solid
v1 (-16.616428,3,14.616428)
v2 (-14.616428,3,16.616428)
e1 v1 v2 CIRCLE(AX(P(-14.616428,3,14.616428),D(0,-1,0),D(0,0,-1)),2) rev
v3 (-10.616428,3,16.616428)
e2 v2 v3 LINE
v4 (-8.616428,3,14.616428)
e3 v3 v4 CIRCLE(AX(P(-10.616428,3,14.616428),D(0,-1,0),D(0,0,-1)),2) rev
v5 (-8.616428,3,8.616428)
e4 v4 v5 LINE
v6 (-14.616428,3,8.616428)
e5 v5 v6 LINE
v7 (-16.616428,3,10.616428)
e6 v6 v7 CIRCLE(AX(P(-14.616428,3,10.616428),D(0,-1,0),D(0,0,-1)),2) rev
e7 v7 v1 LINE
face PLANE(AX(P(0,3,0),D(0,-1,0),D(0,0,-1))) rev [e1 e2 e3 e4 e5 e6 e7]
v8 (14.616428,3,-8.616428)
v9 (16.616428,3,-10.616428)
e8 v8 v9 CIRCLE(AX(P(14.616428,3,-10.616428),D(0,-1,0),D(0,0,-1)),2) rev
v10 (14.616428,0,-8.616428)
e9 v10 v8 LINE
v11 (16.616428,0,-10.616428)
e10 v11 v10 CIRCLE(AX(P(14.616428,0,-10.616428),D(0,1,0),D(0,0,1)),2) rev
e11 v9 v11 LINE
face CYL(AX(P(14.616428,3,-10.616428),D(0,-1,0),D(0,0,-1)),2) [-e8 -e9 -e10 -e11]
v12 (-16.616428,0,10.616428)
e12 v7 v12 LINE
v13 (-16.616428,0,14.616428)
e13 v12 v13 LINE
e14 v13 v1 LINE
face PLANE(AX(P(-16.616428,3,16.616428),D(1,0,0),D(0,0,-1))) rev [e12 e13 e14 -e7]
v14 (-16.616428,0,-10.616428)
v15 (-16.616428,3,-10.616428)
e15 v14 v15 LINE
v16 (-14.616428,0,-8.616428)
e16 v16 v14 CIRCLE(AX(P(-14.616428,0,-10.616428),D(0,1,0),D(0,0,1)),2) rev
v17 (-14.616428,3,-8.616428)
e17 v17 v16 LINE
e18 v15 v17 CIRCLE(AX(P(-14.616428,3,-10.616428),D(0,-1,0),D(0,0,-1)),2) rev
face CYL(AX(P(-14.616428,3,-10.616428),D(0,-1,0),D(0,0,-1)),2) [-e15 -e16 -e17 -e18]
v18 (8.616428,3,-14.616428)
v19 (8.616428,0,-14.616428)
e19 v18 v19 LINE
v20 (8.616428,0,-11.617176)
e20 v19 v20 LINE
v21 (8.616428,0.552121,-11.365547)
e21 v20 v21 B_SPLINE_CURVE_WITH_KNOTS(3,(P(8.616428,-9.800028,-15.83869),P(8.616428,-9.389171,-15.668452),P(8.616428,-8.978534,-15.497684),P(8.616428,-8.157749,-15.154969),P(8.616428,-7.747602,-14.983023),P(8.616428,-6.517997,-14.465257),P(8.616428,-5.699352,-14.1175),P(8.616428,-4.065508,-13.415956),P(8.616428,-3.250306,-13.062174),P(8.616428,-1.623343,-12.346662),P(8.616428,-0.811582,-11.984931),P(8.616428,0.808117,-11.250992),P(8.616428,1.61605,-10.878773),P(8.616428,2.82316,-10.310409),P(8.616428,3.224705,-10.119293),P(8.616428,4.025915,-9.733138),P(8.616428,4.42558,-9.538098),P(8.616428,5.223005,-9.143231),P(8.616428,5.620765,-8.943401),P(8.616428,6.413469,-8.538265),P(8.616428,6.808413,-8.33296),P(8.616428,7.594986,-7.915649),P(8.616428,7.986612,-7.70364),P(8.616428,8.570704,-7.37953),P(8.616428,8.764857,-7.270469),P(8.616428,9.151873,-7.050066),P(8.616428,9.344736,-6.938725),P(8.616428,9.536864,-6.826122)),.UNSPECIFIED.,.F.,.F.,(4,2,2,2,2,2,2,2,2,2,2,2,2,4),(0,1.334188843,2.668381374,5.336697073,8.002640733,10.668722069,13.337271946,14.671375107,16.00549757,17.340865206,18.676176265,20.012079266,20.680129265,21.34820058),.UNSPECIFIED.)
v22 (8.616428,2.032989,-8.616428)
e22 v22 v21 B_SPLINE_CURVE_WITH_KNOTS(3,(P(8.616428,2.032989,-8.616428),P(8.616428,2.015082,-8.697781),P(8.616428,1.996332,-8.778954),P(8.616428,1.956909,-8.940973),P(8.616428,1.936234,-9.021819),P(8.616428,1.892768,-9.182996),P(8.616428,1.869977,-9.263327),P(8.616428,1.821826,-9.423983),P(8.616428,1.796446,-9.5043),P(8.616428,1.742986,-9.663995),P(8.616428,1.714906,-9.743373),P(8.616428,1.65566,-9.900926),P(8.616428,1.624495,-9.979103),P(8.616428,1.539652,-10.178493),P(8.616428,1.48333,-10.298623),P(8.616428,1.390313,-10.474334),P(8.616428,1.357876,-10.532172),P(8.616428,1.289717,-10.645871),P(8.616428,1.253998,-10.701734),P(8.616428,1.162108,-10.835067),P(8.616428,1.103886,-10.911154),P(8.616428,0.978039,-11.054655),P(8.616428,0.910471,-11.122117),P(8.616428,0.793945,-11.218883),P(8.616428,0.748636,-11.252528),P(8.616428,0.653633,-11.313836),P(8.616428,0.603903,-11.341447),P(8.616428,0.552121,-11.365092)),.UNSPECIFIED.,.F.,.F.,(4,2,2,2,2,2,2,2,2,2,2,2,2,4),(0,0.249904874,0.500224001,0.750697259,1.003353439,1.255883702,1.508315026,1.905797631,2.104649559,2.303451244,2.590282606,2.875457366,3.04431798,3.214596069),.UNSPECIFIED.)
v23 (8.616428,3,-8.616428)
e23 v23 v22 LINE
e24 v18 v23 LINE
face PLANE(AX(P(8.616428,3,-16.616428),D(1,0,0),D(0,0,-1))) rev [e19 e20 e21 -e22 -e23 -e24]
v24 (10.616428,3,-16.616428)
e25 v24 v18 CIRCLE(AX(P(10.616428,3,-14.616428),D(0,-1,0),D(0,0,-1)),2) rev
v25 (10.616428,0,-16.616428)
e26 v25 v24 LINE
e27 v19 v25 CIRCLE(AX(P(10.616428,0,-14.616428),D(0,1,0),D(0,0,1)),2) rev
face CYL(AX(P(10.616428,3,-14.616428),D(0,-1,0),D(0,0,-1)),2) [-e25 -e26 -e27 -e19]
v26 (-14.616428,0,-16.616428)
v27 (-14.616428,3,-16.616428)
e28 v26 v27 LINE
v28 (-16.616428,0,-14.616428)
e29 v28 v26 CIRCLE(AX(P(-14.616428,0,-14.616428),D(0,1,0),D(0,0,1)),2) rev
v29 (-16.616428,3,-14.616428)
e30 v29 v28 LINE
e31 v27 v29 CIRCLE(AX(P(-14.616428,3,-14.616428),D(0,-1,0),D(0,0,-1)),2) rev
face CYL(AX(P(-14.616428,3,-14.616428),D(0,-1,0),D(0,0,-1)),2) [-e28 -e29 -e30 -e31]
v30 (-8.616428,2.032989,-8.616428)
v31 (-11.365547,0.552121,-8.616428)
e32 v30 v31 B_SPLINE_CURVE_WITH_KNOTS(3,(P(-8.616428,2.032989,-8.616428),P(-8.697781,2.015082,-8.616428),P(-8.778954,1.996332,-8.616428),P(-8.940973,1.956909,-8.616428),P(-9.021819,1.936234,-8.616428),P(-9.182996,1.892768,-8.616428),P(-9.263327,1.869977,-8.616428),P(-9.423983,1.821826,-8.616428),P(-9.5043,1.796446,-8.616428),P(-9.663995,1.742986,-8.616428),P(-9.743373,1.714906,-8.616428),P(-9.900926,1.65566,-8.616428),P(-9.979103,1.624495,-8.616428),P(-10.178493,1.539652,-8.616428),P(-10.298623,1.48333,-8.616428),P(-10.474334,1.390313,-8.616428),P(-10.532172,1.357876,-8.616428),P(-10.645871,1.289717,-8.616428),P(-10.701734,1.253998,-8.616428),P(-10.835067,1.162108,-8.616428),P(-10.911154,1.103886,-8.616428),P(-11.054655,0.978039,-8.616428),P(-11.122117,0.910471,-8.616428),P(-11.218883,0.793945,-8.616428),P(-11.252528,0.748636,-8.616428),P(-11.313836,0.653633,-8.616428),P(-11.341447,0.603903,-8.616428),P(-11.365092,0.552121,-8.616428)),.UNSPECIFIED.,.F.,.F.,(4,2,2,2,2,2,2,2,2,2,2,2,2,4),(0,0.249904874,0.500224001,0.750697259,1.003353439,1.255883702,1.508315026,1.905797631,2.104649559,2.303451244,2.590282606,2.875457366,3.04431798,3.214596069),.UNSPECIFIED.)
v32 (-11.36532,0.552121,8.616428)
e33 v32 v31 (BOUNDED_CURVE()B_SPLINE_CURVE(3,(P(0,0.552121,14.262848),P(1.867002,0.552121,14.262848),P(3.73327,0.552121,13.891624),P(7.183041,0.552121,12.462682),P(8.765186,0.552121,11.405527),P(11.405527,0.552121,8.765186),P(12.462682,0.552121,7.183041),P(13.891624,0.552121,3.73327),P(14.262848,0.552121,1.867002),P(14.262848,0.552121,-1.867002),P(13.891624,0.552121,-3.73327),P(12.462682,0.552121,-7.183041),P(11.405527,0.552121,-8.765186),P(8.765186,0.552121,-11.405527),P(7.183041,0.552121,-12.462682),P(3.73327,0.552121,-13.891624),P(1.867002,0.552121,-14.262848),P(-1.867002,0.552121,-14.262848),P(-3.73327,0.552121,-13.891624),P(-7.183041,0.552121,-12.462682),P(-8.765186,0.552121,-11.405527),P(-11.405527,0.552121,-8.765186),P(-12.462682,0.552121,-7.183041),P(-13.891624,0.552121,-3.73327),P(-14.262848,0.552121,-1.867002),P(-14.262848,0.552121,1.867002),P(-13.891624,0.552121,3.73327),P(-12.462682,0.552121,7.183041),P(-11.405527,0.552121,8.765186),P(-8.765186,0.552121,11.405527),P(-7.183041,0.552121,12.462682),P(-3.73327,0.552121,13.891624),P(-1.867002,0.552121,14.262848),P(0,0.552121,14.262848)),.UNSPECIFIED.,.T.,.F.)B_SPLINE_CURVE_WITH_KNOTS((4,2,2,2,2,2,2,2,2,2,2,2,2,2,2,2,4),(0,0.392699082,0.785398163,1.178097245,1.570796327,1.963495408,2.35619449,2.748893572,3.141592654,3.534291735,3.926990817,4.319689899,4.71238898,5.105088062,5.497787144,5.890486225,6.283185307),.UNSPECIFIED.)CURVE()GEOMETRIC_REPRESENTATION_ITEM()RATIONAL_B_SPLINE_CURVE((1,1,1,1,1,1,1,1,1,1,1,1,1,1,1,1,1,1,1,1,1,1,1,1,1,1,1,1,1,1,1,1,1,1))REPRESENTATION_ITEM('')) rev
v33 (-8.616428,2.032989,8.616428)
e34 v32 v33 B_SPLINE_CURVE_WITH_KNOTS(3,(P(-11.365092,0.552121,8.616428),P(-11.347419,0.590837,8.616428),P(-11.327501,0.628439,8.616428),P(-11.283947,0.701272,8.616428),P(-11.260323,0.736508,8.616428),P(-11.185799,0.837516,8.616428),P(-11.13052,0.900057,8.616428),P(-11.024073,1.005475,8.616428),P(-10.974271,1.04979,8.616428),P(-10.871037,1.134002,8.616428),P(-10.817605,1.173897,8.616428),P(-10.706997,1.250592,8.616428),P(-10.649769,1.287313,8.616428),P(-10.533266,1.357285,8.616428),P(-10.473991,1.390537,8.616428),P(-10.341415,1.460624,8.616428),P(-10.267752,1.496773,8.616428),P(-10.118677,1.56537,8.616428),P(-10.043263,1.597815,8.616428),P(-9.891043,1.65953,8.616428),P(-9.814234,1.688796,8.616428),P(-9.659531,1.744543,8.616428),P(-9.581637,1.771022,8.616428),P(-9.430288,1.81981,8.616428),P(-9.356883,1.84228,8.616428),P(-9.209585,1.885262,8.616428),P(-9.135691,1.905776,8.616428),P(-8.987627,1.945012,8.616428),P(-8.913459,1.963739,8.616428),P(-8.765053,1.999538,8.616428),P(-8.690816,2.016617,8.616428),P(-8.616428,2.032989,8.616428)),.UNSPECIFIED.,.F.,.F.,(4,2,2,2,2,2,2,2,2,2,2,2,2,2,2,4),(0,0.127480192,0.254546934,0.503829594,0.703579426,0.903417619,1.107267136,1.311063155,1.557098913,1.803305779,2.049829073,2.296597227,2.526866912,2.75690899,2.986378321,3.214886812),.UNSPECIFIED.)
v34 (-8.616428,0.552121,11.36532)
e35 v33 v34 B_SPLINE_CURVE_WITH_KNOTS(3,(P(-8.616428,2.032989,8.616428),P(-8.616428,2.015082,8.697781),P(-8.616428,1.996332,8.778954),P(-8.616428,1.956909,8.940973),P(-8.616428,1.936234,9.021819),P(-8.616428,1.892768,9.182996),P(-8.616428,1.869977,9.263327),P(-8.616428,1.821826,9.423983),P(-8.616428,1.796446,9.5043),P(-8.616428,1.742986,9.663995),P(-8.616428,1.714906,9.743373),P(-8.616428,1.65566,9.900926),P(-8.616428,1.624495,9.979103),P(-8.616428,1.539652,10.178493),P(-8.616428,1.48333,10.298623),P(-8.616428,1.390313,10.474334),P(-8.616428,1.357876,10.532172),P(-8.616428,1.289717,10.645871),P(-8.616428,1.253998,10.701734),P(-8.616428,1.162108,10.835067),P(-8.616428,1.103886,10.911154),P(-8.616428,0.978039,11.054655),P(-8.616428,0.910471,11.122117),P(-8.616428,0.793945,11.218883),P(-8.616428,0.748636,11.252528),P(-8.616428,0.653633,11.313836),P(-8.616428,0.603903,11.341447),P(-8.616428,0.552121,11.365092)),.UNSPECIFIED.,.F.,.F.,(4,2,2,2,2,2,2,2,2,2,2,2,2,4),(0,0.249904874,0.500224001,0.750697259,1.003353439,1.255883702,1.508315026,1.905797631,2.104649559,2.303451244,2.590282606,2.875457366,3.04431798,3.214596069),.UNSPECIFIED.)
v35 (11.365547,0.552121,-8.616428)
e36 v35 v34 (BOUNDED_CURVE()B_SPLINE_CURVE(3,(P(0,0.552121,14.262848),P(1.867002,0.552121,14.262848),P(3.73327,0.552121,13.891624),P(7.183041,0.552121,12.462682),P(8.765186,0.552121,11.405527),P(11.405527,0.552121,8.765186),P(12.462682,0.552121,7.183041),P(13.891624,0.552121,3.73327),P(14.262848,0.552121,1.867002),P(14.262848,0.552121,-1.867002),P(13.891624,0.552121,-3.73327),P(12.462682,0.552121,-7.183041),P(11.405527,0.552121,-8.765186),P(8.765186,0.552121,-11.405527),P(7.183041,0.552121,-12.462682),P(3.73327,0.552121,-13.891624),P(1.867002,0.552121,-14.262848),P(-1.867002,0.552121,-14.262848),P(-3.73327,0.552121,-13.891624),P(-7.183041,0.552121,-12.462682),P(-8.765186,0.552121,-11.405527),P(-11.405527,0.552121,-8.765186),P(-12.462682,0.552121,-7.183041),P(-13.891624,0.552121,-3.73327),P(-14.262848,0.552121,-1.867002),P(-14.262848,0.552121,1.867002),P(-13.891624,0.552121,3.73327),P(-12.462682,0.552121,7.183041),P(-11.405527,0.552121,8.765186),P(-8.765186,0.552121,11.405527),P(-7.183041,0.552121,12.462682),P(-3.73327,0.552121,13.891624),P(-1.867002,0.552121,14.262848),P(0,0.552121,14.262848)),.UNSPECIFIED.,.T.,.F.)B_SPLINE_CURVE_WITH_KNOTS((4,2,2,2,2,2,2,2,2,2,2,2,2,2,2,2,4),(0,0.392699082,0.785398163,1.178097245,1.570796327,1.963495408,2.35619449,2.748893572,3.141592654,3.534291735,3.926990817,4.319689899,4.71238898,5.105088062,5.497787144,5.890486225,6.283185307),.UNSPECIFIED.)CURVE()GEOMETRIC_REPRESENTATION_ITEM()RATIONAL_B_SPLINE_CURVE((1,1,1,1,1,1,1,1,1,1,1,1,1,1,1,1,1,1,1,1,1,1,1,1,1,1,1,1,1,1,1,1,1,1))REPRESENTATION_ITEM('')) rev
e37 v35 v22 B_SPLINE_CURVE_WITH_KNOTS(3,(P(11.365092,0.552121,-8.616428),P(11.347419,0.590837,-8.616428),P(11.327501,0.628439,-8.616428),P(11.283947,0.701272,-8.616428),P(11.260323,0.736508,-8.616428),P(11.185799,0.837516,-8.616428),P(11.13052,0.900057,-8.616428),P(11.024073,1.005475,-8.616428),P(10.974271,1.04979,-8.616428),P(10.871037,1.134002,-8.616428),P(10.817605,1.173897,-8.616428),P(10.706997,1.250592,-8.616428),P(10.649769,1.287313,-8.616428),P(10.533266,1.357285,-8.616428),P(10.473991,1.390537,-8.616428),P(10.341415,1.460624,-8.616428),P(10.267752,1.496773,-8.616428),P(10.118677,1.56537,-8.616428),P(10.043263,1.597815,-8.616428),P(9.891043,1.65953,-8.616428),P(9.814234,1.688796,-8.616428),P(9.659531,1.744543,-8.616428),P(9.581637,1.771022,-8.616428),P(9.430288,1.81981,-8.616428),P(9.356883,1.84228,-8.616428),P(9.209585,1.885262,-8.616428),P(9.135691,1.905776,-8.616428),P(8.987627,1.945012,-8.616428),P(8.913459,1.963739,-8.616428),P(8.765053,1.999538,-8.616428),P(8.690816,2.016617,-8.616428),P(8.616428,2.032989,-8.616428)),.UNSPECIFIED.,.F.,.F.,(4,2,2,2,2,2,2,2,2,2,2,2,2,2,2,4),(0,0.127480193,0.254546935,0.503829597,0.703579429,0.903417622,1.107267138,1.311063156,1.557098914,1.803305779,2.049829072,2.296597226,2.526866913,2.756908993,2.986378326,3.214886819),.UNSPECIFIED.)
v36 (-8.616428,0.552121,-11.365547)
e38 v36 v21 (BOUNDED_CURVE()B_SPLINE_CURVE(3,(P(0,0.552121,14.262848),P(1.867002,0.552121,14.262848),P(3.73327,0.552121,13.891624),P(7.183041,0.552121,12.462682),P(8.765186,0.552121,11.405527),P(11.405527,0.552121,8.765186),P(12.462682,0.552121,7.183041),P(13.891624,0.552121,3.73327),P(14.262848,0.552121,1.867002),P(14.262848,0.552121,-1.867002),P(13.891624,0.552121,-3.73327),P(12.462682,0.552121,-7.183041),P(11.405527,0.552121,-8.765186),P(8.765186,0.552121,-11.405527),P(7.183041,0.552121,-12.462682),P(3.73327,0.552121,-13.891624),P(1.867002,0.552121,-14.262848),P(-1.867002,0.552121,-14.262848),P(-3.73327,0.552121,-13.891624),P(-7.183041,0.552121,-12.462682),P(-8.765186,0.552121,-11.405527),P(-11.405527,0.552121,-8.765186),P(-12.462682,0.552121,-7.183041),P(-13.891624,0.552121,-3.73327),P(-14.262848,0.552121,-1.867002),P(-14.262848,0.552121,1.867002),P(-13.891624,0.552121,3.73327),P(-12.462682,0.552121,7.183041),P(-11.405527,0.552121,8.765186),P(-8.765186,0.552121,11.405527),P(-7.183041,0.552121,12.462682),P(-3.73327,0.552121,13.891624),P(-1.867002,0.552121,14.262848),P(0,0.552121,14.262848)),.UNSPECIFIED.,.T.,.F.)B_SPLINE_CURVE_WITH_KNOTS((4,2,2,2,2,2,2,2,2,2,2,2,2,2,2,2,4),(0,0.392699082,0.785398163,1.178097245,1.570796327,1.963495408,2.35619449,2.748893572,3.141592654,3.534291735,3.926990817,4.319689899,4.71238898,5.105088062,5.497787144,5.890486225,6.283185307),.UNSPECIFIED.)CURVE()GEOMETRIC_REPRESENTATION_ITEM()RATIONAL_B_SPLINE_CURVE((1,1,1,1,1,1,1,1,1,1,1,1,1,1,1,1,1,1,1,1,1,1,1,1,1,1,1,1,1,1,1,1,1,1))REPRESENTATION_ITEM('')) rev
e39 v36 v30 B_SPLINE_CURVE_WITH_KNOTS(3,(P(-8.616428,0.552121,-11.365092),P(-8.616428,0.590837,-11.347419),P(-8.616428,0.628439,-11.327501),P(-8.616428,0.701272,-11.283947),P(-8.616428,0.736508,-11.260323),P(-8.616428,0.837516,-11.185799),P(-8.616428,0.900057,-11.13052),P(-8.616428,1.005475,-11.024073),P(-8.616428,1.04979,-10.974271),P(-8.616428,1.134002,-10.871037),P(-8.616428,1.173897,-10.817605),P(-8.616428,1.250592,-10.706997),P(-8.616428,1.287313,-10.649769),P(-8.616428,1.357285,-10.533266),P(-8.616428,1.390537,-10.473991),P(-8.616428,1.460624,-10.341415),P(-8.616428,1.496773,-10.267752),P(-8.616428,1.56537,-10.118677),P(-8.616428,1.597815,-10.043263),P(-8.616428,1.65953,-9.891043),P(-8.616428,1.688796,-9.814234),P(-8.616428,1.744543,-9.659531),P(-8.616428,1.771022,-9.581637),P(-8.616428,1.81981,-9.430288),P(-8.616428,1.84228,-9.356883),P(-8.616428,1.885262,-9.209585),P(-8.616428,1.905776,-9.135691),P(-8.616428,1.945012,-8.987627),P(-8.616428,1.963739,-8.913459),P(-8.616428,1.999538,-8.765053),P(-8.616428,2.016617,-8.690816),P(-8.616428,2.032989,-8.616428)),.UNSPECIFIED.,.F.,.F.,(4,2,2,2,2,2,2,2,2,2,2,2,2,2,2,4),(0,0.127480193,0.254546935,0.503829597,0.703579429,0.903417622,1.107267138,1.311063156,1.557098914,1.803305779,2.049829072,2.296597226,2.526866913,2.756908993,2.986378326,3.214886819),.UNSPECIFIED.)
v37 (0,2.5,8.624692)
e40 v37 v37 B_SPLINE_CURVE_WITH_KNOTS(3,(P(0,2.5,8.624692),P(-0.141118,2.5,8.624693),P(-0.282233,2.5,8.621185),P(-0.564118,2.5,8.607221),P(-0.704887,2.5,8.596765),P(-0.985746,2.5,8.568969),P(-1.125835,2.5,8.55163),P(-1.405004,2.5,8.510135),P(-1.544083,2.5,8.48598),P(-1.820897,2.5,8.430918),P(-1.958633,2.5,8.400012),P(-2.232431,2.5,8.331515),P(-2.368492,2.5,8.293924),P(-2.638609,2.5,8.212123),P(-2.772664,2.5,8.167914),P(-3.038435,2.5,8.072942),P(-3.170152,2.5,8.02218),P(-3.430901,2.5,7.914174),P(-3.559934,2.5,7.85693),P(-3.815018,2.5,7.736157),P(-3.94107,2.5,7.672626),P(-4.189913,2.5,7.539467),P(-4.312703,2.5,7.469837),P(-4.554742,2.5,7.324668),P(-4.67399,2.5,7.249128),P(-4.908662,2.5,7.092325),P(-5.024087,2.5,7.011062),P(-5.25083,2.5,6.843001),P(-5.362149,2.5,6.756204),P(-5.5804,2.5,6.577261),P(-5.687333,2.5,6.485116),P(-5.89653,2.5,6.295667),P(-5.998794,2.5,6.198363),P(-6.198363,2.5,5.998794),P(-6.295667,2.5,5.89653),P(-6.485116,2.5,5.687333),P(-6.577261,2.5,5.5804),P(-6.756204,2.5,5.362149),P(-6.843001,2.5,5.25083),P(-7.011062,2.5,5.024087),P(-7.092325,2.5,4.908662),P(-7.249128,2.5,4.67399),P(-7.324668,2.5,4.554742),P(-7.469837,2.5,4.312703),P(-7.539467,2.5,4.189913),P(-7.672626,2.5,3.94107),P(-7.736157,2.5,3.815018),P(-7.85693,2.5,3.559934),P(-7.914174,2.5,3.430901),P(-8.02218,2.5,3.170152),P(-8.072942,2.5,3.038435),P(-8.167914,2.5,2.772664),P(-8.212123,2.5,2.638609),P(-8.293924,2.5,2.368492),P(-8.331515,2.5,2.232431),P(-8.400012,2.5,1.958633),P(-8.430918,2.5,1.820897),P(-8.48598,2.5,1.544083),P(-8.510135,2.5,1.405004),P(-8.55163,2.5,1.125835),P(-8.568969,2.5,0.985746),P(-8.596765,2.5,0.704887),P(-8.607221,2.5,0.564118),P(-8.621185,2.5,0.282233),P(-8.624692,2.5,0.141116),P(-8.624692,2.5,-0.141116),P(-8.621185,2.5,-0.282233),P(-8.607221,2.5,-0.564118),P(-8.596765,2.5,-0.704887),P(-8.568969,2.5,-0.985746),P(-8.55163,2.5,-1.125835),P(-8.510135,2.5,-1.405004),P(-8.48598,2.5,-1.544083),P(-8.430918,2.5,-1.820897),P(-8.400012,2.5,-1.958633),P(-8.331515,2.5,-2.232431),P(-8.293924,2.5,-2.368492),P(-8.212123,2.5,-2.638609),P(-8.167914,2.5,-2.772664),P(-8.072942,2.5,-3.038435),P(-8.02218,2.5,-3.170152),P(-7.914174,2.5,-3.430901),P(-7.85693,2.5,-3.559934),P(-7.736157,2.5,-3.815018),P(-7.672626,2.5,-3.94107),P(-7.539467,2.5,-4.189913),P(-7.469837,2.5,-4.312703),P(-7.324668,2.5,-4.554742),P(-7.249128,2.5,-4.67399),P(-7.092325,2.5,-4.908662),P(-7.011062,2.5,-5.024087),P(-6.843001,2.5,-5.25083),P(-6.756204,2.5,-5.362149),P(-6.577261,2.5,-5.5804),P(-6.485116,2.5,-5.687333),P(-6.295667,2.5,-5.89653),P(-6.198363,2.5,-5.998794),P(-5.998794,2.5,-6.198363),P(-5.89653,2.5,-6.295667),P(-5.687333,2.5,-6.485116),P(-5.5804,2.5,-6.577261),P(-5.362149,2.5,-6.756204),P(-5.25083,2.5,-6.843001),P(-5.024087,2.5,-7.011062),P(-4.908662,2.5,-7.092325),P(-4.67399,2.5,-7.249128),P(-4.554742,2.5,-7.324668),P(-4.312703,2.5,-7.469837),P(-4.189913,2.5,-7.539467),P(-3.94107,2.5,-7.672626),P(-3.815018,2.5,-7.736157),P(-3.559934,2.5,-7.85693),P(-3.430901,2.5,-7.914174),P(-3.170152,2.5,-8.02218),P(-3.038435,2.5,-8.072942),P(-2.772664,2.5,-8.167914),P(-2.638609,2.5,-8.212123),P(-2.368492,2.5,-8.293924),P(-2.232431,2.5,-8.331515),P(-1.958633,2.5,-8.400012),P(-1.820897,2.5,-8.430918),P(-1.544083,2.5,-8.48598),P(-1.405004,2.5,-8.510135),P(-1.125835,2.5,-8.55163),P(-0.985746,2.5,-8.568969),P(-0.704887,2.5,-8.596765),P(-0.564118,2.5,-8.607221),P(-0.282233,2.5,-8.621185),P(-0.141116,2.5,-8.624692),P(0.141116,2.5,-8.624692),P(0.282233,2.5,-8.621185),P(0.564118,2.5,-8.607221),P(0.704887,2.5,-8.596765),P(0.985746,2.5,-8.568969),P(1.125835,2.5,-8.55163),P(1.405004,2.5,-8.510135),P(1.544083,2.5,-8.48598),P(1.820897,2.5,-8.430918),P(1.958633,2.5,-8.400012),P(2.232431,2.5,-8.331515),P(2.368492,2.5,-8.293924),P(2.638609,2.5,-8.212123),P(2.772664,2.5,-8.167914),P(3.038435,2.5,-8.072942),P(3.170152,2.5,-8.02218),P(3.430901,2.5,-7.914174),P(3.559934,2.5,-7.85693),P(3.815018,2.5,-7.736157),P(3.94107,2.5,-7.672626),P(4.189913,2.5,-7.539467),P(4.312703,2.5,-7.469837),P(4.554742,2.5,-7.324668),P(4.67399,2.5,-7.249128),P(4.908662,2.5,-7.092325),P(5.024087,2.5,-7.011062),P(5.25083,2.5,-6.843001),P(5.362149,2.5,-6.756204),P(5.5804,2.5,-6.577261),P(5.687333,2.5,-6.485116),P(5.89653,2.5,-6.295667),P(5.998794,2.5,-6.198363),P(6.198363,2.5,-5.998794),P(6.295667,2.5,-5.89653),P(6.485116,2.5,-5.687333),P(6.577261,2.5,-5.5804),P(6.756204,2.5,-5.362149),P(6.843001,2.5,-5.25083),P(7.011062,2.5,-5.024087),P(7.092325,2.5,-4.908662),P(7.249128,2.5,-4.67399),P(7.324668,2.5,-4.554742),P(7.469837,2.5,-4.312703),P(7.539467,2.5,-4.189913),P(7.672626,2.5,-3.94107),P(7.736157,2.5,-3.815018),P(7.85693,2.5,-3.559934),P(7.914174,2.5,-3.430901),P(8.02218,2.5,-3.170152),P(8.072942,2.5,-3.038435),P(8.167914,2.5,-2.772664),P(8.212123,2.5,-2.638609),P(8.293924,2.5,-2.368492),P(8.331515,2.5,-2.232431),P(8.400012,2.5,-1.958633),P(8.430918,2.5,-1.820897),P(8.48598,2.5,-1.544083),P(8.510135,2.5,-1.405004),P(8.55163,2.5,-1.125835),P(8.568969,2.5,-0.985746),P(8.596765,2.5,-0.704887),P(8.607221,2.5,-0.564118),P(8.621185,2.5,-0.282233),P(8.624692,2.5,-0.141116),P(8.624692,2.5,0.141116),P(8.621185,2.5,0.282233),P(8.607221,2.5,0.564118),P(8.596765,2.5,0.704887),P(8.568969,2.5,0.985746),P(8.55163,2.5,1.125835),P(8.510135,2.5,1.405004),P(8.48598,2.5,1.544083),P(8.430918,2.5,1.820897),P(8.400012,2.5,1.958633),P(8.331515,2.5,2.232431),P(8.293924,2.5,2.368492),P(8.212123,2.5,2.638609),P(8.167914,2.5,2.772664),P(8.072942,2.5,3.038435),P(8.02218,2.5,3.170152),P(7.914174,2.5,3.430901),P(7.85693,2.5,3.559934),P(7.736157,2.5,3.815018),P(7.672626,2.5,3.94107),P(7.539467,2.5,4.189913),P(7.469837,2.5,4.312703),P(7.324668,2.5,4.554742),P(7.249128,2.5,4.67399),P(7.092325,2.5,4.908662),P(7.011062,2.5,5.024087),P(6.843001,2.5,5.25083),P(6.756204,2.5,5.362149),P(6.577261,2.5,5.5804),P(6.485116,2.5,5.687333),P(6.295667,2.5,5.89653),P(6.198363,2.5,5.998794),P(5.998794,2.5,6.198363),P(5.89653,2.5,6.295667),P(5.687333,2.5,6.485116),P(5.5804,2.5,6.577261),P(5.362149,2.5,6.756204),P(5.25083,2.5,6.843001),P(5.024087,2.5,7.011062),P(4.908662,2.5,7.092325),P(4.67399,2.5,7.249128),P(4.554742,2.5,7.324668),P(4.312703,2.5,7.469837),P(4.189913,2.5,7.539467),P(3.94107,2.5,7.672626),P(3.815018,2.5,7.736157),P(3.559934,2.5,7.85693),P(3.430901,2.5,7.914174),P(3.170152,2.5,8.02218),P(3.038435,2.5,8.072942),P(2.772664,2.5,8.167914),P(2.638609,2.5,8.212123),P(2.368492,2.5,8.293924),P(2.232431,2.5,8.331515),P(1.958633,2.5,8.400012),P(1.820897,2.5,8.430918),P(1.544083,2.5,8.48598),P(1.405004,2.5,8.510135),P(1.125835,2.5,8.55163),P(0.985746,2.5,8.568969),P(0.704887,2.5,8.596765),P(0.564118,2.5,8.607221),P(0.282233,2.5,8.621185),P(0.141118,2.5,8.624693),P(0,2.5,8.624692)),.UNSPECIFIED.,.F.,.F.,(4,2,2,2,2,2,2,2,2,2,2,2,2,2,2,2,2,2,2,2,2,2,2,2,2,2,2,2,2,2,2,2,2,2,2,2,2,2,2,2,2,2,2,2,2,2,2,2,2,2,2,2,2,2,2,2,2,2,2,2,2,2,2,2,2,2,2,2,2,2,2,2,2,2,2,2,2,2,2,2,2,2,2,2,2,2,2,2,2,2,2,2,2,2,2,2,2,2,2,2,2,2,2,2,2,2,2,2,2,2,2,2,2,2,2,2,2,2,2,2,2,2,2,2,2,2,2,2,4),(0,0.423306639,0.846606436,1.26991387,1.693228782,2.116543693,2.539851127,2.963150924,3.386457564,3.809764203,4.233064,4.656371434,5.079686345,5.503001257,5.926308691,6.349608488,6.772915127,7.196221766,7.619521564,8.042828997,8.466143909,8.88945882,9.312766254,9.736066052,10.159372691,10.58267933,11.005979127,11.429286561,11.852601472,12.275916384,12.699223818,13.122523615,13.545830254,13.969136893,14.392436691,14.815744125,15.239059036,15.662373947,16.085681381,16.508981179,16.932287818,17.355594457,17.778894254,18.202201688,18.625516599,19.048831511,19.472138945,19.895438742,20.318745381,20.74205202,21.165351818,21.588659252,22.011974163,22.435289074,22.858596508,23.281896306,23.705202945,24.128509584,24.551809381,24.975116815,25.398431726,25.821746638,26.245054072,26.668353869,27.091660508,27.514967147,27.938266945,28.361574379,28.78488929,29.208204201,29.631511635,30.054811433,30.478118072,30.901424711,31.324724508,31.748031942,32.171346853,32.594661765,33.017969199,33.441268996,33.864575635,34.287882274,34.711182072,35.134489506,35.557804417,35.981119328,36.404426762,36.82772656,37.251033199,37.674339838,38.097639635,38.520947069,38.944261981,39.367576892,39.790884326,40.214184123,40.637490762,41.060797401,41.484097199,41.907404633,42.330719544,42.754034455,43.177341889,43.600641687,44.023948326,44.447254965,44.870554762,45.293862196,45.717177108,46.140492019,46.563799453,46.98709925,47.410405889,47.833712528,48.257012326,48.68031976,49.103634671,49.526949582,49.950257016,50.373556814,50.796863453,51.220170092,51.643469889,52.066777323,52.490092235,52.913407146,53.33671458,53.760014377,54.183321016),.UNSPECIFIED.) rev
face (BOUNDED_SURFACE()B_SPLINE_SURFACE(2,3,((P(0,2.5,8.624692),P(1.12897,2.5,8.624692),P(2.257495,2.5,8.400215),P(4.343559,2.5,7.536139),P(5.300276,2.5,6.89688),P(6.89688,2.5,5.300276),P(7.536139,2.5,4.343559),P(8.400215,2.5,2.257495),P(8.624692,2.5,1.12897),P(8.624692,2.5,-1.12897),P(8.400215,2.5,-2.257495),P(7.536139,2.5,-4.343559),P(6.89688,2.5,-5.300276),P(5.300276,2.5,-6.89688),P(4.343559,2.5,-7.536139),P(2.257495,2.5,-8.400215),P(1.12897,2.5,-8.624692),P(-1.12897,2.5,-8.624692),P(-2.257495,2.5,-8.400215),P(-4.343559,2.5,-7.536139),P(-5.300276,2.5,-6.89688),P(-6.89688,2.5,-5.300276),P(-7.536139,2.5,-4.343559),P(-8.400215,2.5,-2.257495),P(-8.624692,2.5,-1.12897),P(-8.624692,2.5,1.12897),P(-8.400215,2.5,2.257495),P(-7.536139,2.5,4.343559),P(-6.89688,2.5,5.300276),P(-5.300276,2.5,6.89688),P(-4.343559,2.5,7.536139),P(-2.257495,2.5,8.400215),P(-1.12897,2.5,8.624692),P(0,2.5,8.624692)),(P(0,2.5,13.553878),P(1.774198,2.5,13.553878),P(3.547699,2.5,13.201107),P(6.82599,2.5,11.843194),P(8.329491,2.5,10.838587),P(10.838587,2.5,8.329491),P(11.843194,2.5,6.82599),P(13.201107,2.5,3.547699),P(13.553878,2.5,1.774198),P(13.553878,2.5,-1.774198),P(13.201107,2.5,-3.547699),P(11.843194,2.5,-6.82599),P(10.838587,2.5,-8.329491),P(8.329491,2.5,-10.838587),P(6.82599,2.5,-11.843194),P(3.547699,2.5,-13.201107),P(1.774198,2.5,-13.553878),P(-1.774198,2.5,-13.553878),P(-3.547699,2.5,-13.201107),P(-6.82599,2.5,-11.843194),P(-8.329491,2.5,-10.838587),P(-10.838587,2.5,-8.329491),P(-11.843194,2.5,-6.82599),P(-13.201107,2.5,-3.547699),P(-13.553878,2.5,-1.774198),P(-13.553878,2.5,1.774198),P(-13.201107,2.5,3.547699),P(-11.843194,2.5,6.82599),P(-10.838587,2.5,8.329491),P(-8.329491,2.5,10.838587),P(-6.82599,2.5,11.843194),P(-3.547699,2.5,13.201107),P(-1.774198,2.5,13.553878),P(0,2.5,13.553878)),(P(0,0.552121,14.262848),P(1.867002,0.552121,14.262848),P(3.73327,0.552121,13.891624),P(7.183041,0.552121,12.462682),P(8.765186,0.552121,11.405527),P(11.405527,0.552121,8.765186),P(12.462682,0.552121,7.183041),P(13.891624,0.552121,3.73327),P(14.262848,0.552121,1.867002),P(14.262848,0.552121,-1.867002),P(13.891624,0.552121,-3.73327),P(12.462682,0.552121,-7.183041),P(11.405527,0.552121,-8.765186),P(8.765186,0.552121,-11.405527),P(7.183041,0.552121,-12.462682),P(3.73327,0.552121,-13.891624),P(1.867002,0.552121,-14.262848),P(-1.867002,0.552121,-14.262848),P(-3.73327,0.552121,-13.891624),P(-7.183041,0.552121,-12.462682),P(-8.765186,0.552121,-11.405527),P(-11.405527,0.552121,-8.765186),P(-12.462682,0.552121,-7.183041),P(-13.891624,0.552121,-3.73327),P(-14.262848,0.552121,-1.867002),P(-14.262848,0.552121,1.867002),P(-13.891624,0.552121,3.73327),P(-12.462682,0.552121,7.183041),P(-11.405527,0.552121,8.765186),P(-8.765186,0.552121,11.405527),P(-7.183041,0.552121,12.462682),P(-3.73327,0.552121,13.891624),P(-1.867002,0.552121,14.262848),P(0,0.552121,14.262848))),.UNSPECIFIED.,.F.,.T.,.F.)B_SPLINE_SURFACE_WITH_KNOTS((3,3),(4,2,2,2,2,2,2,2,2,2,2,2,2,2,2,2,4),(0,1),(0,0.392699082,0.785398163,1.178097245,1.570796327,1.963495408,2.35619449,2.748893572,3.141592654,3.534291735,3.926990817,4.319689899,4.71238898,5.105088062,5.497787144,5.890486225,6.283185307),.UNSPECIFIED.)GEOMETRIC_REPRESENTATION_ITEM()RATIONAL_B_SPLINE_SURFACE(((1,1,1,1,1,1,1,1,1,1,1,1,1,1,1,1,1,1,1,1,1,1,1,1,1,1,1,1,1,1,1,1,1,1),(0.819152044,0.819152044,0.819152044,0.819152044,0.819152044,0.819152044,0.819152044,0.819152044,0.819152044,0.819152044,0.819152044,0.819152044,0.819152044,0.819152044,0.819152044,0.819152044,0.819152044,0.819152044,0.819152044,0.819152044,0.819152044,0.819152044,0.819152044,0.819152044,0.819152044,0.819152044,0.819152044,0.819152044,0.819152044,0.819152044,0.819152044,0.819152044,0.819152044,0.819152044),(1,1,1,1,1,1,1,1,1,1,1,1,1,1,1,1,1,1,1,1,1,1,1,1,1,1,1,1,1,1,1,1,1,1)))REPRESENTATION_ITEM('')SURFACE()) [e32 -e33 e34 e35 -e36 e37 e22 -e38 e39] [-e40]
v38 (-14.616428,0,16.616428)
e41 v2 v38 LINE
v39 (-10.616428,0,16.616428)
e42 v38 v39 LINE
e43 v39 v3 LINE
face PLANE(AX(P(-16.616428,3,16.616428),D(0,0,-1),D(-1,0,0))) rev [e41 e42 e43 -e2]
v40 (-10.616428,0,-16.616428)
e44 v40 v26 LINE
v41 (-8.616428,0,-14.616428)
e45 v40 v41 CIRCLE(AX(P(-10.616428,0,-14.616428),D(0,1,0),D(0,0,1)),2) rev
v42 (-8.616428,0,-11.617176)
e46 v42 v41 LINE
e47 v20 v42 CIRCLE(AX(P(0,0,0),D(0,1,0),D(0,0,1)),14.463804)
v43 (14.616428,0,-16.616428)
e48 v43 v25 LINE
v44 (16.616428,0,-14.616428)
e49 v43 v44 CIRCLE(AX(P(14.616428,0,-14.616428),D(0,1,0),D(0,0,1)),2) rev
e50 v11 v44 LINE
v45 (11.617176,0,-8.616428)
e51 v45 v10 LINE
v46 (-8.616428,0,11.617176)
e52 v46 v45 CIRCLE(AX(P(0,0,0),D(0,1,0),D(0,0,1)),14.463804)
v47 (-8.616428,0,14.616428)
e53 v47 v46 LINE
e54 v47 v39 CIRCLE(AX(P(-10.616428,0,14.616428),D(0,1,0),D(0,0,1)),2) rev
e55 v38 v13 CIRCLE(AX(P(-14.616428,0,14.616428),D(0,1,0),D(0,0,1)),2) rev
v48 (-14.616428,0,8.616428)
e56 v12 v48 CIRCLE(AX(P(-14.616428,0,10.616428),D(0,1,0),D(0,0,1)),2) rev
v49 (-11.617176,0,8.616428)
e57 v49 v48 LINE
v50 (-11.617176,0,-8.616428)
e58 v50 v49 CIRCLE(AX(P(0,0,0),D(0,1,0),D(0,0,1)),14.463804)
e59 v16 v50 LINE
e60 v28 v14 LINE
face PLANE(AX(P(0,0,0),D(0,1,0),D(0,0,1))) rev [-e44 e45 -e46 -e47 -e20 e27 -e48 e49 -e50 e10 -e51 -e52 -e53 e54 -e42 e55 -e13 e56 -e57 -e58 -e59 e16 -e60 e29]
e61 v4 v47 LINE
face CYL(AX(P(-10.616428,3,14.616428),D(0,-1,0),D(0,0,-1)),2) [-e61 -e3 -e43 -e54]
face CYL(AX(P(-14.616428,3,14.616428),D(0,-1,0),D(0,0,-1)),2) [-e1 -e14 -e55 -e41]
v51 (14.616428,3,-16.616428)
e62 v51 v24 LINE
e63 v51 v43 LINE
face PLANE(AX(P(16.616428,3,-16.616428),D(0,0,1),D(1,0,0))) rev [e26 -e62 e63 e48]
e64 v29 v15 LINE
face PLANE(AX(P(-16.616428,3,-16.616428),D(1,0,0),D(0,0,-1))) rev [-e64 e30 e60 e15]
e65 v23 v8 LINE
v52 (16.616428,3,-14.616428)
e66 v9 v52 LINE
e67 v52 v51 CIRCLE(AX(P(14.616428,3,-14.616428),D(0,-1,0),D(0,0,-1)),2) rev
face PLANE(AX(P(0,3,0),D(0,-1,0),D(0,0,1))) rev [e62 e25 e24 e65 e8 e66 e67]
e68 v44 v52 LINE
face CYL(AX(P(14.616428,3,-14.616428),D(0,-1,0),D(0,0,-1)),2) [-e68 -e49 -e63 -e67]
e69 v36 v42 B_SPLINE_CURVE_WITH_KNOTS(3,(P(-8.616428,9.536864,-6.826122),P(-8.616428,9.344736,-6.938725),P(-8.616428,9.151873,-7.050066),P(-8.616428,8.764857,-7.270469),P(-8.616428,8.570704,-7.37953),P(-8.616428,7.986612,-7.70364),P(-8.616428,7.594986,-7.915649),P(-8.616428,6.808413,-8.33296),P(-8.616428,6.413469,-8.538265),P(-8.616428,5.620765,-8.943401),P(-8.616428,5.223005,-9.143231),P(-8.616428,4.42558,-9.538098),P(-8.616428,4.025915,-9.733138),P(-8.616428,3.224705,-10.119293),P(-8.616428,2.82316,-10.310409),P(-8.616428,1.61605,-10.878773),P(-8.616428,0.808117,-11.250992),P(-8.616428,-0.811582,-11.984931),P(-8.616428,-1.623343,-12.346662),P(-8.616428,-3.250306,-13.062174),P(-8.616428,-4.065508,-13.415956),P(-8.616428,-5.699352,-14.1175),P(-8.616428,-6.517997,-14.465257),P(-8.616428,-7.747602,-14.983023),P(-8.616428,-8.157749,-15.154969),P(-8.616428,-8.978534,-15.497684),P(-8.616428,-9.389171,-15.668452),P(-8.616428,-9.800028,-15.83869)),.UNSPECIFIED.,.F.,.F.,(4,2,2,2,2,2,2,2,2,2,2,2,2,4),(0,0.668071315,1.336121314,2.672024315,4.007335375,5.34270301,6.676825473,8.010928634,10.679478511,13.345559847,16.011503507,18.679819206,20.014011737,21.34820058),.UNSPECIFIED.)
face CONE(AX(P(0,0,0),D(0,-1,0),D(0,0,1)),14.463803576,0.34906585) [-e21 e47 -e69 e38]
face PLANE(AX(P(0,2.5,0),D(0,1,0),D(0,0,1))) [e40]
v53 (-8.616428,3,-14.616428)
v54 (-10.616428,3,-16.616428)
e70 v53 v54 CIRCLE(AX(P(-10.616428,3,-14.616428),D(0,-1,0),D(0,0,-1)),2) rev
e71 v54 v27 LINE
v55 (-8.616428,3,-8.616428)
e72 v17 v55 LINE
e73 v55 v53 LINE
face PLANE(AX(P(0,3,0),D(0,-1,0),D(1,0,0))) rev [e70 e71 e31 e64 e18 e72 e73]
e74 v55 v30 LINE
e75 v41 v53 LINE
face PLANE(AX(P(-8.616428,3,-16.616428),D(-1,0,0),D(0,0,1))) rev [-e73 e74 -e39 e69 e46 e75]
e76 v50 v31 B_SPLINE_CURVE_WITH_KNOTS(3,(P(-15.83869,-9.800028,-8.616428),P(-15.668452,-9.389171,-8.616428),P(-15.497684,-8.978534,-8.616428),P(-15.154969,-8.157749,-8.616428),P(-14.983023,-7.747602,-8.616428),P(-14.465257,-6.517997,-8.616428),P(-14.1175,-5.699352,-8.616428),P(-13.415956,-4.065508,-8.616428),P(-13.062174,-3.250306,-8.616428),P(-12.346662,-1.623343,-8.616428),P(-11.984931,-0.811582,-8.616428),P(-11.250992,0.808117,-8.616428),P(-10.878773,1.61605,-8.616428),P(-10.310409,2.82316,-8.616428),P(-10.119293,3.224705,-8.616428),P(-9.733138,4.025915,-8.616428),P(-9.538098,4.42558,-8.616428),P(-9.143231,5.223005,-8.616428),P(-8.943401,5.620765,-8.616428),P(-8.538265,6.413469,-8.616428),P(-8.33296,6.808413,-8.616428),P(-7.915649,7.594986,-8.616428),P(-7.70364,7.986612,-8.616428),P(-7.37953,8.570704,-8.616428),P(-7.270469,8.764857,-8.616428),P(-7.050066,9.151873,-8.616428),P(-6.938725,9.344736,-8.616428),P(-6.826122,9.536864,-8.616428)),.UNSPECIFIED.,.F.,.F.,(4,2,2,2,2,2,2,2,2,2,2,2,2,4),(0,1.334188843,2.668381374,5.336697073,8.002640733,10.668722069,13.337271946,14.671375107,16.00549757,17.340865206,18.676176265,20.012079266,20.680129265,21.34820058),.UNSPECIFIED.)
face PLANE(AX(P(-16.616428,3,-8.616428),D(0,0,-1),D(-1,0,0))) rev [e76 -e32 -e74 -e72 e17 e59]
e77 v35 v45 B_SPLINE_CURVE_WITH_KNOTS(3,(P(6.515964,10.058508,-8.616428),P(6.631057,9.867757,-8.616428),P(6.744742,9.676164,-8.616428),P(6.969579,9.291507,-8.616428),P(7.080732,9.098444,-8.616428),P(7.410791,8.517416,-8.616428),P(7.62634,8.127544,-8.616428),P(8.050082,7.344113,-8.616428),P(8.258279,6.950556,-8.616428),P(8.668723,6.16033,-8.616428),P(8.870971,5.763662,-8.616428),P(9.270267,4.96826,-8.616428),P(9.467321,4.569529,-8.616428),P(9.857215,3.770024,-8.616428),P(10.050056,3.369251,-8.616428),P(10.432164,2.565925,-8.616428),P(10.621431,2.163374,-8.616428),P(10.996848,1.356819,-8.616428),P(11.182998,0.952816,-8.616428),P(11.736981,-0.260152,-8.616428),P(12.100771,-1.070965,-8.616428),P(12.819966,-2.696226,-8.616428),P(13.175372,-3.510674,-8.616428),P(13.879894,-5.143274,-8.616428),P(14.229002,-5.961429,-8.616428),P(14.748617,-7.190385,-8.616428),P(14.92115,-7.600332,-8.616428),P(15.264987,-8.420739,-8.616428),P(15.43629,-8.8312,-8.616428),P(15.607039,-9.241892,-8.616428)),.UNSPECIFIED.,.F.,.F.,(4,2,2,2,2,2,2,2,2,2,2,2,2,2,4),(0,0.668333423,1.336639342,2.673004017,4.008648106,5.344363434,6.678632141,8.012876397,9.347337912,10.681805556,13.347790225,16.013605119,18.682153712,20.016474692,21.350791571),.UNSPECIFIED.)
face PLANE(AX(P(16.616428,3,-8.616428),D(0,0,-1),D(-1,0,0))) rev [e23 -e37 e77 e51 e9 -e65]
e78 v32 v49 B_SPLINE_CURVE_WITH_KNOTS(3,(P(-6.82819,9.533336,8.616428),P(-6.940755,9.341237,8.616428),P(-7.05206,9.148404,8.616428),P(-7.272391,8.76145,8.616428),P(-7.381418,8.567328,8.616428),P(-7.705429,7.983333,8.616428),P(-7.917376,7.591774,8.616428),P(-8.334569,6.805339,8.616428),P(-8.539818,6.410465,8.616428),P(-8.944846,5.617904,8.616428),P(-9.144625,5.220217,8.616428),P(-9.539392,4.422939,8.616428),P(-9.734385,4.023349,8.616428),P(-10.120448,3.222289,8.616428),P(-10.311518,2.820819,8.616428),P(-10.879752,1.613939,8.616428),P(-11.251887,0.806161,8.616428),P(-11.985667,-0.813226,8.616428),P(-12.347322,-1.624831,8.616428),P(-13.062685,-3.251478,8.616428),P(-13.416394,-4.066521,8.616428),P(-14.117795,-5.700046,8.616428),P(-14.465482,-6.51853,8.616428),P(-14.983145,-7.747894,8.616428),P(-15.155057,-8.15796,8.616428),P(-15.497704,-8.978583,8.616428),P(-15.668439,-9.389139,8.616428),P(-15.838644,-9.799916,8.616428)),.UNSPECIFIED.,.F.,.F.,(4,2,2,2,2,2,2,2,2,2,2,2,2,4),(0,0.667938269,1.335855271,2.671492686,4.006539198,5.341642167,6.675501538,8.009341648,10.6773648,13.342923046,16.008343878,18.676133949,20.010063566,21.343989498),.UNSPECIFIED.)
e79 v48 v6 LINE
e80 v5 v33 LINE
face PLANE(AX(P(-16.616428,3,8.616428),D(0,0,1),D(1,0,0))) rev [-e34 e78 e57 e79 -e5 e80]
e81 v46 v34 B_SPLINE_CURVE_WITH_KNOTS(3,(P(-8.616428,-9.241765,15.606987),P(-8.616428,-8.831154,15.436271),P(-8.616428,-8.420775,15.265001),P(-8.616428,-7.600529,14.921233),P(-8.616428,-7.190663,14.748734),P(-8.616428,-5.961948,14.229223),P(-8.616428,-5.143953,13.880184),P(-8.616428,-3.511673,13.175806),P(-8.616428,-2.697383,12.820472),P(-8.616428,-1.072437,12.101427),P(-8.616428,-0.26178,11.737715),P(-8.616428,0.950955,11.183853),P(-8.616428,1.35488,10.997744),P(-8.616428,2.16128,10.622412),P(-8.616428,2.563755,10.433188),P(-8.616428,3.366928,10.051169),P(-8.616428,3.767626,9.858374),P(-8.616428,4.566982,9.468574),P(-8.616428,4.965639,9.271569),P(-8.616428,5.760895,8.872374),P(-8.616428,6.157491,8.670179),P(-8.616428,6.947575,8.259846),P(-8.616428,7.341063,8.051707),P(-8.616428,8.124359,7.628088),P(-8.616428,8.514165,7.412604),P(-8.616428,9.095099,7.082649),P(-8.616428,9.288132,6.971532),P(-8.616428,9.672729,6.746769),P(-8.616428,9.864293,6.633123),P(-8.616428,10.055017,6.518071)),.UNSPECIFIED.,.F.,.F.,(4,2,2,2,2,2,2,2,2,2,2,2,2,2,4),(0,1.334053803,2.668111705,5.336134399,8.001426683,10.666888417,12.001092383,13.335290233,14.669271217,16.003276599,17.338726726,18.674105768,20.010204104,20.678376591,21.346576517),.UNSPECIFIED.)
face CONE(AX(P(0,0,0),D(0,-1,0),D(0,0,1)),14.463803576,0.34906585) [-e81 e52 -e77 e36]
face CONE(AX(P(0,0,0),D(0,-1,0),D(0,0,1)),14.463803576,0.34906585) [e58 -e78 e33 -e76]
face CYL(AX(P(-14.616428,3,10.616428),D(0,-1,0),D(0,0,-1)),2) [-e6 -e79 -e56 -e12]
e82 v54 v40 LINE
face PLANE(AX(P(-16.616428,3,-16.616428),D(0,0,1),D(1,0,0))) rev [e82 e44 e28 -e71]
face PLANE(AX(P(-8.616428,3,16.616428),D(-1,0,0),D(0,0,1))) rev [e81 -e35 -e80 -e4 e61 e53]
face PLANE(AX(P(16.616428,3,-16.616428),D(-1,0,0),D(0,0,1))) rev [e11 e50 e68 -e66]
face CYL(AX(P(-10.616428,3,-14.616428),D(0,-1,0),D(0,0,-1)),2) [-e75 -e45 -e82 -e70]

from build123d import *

# Parameters (mm, degrees)
SKETCH2_R                = 14.463803576
BOSS_EXTRUDE1_DEPTH      = 2.5
BOSS_EXTRUDE1_TAPER      = 20
SKETCH4_W                = 8
SKETCH4_H                = 8
BOSS_EXTRUDE2_DEPTH      = 3
FILLET2_R                = 2
CIRPATTERN1_COUNT        = 4
FILLET2_OF_CIRPATTERN1_R = 2


with BuildPart() as part:
    # Sketch2 → Boss-Extrude1 (new body)
    with BuildSketch(Plane(origin=(0, 0, 0), x_dir=(1, 0, 0), z_dir=(0, 1, 0))):
        Circle(SKETCH2_R)
    extrude(amount=BOSS_EXTRUDE1_DEPTH, taper=BOSS_EXTRUDE1_TAPER)

    # Fillet1
    # an asymmetric fillet: 6, 4 mm, written as the material it takes off along each edge
    with BuildSketch(Plane(origin=(0, 2.5, 0), x_dir=(1, 0, 0), z_dir=(0, 0, -1))) as fillet1_piece_1:
        with BuildLine():
            Bezier((14.262848017, 1.94787914), (13.55387799, 0), (8.624692292, 0), weights=[1, 0.819152044, 1])
            Line((8.624692292, 0), (13.55387799, 0))
            Line((13.55387799, 0), (14.262848017, 1.94787914))
        make_face()
    revolve(axis=Axis((0, 2.5, 0), (0, -1, 0)), mode=Mode.SUBTRACT)

    # Sketch4 → Boss-Extrude2 (add)
    with BuildSketch(Plane(origin=(0, 0, 0), x_dir=(1, 0, 0), z_dir=(0, 1, 0))):
        with Locations((-12.616427752, -12.616427752)):
            Rectangle(SKETCH4_W, SKETCH4_H)
    boss_extrude2 = extrude(amount=BOSS_EXTRUDE2_DEPTH)

    # Fillet2
    fillet2_edges = [part.edges().sort_by_distance(p)[0] for p in [
        (-8.616427752, 1.5, 16.616427752),
        (-16.616427752, 1.5, 8.616427752),
        (-16.616427752, 1.5, 16.616427752),
    ]]
    fillet(fillet2_edges, radius=FILLET2_R)

    # CirPattern1: Boss-Extrude2 ×4 about axis, 1 skipped
    cirpattern1_axis = Axis((0, 0, 0), (0, 1, 0))
    add([boss_extrude2.rotate(cirpattern1_axis, i * 360 / CIRPATTERN1_COUNT) for i in range(1, CIRPATTERN1_COUNT) if i not in (1,)])

    # Fillet2 of CirPattern1
    fillet2_of_cirpattern1_edges = [part.edges().sort_by_distance(p)[0] for p in [
        (8.616427752, 1.5, -16.616427752),
        (16.616427752, 1.5, -8.616427752),
        (16.616427752, 1.5, -16.616427752),
        (-16.616427752, 1.5, -8.616427752),
        (-8.616427752, 1.5, -16.616427752),
        (-16.616427752, 1.5, -16.616427752),
    ]]
    fillet(fillet2_of_cirpattern1_edges, radius=FILLET2_OF_CIRPATTERN1_R)


solid = part.part
